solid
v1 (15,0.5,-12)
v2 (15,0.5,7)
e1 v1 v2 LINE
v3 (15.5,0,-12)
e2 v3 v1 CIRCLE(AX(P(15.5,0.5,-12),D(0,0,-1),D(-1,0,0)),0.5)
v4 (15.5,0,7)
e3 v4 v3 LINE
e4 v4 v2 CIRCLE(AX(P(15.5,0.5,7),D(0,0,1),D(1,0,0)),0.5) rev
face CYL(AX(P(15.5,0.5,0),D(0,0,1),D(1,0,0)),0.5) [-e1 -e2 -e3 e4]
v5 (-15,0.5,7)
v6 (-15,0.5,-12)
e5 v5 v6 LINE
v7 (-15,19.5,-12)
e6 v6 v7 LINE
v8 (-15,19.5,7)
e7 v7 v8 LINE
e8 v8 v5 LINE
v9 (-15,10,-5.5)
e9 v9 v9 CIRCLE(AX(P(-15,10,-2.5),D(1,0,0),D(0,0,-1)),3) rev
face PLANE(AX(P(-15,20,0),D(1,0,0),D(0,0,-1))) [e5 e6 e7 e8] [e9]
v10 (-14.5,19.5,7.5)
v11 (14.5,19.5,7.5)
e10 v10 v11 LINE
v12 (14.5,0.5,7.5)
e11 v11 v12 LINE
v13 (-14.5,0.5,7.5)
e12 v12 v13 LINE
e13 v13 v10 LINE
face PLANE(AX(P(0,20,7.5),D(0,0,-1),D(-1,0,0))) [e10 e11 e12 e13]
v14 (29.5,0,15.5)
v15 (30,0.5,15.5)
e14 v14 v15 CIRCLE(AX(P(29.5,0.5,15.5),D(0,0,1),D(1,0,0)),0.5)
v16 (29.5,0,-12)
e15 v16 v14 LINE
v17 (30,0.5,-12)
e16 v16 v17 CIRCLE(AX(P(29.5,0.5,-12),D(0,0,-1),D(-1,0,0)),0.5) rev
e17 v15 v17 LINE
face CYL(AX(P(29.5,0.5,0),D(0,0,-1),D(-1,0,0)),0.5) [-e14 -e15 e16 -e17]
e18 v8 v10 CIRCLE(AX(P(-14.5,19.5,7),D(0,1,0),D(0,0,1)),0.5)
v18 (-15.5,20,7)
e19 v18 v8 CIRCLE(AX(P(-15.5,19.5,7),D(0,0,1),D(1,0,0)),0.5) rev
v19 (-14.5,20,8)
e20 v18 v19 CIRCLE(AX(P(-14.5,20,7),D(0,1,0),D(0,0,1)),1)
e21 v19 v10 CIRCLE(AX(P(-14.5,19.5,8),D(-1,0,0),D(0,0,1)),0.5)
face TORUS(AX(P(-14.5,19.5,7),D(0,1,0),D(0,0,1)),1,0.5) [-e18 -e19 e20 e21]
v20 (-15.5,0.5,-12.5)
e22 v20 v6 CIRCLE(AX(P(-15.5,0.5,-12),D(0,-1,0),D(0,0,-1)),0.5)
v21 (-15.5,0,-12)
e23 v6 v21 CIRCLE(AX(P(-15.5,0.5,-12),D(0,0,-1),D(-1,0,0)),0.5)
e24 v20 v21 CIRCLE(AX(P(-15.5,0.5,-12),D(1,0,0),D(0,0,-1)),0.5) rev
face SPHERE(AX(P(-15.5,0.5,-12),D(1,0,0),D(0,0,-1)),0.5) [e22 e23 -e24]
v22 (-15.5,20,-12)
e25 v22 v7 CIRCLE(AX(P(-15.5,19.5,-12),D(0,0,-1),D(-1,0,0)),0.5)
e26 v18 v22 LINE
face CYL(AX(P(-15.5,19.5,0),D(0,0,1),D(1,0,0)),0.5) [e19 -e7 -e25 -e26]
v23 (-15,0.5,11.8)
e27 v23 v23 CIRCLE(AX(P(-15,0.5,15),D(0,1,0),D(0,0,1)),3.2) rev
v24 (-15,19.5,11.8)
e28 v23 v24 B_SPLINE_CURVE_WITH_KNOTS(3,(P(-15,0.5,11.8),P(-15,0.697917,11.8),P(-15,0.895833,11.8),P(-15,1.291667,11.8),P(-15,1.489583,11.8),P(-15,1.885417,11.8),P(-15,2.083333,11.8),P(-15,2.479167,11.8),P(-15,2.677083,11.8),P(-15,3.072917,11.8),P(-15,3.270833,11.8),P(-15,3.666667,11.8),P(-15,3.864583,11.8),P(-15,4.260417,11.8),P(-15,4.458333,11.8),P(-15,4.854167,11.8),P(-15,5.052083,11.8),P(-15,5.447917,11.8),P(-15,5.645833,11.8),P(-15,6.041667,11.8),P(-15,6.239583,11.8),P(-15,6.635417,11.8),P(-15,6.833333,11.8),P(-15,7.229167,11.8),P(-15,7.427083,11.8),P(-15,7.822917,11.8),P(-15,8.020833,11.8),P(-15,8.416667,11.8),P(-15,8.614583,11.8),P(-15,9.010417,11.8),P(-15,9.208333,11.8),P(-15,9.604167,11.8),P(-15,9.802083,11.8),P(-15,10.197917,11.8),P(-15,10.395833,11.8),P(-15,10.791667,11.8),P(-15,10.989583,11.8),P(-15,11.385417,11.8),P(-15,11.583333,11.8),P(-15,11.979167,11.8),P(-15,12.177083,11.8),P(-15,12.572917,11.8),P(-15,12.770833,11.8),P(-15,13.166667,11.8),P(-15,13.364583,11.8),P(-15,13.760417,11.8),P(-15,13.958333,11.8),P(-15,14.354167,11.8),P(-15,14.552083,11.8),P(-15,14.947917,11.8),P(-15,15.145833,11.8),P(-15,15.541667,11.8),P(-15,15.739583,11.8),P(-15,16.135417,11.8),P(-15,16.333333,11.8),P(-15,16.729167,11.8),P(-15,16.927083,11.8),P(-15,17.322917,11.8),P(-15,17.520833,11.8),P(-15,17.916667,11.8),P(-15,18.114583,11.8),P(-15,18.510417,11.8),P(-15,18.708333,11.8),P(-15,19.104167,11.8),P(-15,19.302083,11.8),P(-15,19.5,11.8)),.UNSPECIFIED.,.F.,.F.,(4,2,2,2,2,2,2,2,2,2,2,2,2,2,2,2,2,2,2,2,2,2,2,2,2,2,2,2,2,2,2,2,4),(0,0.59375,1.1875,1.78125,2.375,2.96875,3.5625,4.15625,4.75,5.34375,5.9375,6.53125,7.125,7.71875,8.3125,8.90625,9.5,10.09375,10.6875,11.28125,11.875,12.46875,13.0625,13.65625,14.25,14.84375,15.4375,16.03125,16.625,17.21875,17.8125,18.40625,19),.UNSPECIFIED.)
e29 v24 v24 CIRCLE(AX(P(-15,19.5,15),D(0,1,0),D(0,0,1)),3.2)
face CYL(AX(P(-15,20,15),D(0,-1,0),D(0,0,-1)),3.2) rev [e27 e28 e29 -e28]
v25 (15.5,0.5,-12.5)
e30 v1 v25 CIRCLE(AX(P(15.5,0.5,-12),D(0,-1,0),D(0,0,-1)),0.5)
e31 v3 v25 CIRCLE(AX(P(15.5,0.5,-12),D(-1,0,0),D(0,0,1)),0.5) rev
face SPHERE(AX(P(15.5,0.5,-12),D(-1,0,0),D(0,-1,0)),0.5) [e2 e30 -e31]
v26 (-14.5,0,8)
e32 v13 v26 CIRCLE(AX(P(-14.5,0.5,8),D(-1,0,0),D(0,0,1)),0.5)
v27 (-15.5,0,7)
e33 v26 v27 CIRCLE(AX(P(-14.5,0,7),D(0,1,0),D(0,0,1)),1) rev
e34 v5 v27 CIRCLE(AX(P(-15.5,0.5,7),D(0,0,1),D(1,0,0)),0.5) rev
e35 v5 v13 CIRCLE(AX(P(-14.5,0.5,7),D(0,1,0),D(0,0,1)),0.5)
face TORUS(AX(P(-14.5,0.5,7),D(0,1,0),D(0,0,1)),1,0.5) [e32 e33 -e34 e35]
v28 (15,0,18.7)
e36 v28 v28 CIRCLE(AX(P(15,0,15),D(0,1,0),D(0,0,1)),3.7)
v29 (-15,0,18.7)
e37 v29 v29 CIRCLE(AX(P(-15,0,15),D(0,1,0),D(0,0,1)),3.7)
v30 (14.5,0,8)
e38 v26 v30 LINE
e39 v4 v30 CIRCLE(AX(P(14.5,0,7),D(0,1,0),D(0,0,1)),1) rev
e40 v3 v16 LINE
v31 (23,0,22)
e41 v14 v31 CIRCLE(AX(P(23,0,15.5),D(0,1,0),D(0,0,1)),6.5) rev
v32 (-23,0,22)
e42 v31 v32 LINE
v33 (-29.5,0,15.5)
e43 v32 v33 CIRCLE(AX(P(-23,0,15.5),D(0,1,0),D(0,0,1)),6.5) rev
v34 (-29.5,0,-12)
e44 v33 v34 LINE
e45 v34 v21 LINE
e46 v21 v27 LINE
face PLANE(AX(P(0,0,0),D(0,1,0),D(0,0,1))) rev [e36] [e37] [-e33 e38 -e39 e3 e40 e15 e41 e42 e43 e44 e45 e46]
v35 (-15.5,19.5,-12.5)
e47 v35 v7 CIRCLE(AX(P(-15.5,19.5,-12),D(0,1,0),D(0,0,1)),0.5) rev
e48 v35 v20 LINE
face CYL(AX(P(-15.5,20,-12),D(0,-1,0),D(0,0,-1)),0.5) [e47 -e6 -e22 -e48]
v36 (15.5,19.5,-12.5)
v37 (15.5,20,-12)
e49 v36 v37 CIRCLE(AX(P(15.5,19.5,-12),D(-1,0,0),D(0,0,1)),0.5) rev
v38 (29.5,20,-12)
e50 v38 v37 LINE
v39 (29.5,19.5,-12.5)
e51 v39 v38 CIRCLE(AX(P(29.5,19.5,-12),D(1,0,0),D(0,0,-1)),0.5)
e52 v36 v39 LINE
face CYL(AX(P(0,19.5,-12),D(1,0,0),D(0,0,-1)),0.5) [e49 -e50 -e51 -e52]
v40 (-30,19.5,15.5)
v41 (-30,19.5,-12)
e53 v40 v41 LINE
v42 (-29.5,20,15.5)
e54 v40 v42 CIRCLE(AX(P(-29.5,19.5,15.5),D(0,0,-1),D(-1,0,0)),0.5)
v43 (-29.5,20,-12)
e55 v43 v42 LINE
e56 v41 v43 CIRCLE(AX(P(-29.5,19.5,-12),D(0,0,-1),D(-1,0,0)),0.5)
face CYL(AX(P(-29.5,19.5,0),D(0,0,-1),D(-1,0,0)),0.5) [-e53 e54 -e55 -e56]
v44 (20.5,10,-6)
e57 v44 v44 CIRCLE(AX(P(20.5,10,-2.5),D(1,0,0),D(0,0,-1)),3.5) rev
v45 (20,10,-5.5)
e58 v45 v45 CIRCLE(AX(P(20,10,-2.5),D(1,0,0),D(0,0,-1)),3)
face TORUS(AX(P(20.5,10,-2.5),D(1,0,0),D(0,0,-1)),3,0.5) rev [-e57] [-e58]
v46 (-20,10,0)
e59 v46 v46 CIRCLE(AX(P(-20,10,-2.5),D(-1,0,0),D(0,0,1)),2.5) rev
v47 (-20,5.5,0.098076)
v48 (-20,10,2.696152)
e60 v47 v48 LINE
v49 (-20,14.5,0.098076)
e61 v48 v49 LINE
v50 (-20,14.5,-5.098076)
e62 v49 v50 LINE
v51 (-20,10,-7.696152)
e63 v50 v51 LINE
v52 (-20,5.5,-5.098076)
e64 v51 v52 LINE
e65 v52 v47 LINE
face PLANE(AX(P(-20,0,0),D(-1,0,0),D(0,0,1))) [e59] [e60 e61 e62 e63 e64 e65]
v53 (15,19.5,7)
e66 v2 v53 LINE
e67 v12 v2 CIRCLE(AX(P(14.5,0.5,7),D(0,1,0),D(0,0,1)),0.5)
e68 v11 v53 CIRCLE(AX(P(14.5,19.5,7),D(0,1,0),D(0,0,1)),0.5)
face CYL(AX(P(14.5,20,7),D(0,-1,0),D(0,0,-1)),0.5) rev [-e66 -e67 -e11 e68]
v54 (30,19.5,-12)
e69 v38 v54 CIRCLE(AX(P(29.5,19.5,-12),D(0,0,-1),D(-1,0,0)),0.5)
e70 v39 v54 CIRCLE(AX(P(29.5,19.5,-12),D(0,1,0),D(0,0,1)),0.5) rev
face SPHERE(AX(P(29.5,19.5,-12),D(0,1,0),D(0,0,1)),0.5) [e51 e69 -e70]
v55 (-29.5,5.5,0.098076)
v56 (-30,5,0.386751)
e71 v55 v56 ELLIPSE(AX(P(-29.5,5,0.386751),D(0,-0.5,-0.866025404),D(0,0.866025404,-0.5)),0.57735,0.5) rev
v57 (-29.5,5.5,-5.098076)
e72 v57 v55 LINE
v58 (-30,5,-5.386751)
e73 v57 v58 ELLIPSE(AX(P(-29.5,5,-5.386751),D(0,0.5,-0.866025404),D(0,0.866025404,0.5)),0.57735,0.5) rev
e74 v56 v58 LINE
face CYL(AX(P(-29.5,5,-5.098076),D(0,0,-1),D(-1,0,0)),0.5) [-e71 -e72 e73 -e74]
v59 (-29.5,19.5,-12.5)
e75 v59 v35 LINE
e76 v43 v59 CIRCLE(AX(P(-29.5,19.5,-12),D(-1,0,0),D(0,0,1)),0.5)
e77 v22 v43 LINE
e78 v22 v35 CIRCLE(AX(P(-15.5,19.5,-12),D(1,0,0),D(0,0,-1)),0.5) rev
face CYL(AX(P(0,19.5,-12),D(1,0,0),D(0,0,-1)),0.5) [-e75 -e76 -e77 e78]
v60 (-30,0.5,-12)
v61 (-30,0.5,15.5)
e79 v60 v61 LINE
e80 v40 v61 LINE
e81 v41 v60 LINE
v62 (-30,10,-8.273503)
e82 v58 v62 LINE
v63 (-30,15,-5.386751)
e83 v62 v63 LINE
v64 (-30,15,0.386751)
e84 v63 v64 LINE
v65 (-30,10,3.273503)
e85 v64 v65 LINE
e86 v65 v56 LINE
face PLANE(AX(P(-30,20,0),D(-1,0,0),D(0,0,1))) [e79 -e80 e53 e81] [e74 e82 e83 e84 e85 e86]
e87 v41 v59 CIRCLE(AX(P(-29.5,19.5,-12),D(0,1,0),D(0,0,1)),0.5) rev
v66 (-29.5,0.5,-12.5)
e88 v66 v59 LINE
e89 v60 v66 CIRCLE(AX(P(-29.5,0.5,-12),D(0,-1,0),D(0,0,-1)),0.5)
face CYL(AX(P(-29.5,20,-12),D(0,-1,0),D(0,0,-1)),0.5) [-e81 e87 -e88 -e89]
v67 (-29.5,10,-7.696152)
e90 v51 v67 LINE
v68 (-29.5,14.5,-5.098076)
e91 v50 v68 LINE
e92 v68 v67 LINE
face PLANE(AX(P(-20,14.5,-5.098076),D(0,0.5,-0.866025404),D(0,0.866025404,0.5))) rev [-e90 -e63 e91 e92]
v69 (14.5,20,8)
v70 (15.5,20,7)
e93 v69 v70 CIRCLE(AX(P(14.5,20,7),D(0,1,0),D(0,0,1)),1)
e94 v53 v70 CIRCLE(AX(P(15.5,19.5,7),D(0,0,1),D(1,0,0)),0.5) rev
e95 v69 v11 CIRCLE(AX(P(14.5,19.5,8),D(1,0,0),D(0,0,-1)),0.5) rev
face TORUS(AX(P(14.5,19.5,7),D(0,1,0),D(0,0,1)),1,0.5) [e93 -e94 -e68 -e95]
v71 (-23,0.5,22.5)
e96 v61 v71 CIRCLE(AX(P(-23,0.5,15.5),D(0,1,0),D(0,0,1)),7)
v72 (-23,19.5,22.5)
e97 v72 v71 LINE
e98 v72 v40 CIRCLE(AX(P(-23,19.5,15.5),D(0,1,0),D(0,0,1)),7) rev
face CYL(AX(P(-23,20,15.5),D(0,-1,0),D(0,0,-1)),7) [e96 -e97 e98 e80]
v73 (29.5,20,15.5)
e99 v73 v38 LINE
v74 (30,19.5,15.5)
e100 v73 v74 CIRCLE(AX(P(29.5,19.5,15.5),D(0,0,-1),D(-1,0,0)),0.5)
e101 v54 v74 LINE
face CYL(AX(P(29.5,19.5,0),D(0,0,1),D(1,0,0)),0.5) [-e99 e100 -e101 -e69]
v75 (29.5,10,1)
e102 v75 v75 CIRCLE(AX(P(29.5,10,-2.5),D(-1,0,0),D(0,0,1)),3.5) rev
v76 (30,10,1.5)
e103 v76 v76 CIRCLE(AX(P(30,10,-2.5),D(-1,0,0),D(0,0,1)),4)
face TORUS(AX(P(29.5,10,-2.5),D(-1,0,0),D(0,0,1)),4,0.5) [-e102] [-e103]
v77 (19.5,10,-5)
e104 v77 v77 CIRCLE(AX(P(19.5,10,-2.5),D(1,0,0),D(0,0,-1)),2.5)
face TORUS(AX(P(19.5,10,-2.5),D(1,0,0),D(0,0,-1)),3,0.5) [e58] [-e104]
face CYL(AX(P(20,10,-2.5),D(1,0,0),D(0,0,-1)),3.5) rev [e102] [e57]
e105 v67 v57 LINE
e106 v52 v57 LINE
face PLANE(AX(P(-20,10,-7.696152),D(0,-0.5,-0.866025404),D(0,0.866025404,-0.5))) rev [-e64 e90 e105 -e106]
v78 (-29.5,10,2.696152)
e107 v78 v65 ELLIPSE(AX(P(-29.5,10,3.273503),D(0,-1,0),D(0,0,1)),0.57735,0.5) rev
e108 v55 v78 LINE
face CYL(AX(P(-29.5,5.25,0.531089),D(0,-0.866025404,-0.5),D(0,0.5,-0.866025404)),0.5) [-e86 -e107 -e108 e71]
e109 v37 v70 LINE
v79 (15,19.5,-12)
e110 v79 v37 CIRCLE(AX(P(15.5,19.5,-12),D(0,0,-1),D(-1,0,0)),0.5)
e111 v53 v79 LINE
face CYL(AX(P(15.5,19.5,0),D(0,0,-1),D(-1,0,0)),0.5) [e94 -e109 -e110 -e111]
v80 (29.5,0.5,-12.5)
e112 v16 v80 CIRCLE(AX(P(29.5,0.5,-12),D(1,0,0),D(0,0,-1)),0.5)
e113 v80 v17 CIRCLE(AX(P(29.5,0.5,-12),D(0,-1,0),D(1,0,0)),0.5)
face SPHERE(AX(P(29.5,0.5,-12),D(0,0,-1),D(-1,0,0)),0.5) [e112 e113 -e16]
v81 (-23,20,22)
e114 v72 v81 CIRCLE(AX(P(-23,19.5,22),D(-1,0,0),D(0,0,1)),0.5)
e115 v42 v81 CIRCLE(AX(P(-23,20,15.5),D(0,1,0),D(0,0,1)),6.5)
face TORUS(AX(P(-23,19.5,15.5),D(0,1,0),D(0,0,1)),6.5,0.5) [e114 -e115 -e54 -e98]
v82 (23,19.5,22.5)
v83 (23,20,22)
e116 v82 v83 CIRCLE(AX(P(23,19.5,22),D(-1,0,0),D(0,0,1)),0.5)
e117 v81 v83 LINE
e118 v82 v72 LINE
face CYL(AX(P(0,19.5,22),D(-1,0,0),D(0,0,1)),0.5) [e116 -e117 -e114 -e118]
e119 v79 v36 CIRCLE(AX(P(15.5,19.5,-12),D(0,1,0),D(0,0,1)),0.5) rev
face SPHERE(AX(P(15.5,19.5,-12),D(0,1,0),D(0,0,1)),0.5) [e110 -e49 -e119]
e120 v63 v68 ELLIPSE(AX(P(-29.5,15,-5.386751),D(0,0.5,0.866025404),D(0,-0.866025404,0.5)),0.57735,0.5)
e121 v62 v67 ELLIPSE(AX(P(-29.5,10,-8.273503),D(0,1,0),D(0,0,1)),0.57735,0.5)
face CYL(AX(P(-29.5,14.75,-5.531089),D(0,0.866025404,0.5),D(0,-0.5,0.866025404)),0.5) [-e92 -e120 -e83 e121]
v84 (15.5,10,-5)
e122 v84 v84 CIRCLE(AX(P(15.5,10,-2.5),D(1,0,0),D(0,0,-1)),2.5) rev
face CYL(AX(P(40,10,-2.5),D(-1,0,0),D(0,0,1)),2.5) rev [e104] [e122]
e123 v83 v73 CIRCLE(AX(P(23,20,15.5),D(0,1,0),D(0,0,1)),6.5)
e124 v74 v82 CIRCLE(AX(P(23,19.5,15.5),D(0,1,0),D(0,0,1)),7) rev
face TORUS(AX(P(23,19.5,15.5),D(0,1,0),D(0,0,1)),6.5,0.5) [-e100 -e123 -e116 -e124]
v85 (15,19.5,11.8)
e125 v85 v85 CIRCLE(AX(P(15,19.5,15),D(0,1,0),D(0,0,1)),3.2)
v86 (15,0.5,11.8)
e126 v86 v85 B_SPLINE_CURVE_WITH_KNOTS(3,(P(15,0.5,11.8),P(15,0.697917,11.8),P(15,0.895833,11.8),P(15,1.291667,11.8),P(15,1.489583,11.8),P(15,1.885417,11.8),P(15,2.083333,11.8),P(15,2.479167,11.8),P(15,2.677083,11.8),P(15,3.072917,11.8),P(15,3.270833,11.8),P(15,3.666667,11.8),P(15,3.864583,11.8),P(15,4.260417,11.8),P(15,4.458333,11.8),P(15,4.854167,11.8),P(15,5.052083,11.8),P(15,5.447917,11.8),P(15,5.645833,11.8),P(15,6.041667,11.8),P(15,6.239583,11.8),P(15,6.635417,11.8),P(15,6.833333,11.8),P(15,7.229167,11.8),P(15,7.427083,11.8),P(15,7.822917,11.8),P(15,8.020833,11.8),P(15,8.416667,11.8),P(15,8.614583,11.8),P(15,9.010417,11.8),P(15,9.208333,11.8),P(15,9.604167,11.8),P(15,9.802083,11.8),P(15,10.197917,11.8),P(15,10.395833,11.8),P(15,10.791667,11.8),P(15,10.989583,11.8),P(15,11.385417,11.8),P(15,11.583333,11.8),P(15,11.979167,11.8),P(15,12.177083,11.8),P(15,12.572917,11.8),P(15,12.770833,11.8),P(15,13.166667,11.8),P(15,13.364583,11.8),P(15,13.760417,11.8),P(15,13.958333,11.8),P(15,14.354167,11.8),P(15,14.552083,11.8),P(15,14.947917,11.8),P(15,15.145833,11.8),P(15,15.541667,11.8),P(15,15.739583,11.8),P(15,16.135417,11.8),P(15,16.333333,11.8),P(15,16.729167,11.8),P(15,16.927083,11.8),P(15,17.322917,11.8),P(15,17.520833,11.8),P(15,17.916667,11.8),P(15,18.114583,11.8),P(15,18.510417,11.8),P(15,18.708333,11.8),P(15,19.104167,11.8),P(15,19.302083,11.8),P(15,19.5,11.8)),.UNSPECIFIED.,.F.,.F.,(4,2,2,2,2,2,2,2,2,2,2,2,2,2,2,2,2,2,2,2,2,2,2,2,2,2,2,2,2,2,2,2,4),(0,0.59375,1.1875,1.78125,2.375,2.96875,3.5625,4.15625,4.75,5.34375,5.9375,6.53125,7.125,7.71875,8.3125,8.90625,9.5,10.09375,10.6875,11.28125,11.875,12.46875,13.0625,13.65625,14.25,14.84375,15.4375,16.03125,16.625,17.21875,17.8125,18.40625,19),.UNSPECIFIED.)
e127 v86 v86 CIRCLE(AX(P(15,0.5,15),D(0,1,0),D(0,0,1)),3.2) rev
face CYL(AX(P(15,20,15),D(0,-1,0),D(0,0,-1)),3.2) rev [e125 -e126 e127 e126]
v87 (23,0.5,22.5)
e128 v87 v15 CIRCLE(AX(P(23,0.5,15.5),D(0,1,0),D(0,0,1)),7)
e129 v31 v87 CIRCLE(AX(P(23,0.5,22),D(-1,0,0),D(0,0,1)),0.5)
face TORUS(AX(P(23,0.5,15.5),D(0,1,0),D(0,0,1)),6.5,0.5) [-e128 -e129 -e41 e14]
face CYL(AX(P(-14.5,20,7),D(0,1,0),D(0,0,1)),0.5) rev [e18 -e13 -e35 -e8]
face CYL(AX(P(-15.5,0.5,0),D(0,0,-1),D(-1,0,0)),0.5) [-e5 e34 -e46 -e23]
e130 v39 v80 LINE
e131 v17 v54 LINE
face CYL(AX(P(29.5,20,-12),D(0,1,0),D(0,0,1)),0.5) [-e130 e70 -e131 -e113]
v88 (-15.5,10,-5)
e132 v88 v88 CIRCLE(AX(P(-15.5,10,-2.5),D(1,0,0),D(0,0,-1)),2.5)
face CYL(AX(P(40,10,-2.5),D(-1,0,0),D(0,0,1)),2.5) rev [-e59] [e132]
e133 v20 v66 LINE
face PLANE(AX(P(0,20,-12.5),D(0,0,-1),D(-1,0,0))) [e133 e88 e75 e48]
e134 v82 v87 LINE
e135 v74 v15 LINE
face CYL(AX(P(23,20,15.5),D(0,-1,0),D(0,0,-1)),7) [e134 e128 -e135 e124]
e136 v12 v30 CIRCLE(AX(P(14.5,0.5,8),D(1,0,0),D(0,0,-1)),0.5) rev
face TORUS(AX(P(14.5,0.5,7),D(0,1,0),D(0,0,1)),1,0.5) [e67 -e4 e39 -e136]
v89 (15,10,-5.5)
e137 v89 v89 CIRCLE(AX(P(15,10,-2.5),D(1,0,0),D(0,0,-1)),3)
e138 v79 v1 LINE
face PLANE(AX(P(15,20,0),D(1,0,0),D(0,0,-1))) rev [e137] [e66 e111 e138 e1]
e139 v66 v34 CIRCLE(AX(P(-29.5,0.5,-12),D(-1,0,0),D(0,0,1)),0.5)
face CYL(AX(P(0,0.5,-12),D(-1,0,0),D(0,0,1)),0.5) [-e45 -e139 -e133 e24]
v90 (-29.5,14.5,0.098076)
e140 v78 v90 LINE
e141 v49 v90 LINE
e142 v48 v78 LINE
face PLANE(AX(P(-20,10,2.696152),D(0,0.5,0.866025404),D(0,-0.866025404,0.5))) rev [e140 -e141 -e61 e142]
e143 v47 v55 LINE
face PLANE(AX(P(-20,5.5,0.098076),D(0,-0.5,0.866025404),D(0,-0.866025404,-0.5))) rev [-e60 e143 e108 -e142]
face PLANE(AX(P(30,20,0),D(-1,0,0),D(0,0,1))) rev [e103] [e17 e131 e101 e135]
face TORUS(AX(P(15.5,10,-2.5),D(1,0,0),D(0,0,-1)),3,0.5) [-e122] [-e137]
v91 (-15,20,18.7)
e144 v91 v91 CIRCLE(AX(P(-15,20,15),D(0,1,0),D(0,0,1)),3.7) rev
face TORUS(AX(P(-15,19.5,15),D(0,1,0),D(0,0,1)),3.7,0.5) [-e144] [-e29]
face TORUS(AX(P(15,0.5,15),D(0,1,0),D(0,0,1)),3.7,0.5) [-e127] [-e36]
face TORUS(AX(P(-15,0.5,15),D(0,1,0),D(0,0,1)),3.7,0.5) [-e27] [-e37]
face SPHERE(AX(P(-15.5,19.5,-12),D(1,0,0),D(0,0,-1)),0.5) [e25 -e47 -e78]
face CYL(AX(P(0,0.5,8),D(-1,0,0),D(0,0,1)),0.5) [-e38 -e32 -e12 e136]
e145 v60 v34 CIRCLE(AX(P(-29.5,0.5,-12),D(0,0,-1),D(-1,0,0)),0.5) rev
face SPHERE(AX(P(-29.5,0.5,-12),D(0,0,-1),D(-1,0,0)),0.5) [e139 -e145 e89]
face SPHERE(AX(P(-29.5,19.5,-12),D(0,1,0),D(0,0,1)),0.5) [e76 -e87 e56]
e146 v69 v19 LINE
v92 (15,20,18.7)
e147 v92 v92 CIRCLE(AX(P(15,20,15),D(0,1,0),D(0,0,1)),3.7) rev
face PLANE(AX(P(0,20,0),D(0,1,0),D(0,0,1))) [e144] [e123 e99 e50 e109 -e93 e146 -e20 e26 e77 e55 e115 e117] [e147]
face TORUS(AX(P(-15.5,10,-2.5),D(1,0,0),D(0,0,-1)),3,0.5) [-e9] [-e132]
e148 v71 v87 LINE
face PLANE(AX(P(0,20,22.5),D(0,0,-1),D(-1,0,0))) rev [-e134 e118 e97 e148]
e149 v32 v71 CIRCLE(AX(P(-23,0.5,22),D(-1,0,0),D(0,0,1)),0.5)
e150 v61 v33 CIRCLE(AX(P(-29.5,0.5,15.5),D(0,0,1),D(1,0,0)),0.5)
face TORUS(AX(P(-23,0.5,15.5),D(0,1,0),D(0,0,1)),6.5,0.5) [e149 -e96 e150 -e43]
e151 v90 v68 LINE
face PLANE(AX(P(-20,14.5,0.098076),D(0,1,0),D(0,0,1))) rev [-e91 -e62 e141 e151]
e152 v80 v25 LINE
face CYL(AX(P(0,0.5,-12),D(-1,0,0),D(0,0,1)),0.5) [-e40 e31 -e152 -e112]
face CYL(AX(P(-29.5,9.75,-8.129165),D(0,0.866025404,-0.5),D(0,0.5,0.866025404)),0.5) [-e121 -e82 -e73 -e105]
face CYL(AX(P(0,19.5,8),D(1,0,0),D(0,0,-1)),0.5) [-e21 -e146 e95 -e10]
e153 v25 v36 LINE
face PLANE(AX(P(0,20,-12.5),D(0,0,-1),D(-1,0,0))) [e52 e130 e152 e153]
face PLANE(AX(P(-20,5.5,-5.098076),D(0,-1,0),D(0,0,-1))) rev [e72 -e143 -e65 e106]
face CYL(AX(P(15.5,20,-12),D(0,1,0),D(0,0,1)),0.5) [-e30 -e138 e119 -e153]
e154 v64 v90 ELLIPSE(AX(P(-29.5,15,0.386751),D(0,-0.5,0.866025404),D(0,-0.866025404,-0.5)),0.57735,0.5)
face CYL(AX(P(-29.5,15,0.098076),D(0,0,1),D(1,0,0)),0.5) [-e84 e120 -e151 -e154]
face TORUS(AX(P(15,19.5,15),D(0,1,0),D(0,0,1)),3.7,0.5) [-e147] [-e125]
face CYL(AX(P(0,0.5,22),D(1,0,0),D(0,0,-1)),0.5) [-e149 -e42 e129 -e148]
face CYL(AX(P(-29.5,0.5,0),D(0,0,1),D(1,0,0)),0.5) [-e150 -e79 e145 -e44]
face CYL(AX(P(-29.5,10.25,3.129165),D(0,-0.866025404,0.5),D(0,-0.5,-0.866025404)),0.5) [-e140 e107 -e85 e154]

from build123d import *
from build123d.topology import SkipClean

# Parameters (mm, degrees)
SKETCH1_R           = 3.2
BOSS_EXTRUDE1_DEPTH = 20
SKETCH2_R           = 2.5
CUT_EXTRUDE1_DEPTH  = 70
FILLET1_R           = 0.5
SKETCH4_R           = 3.5
CUT_EXTRUDE2_DEPTH  = 10
CUT_EXTRUDE3_DEPTH  = 10
FILLET2_R           = 0.5


with BuildPart() as part:
    # Sketch1 → Boss-Extrude1 (new body)
    # profile 1 of 2: a face of its own
    with SkipClean():  # the faces are left unmerged after this step: merging them gives an invalid solid
        with BuildSketch(Plane(origin=(0, 0, 0), x_dir=(1, 0, 0), z_dir=(0, 1, 0))):
            with BuildLine():
                Line((-30, 12.5), (-30, -12.5))
                Line((-30, -12.5), (-16.997498436, -12.5))
                ThreePointArc((-16.997498436, -12.5), (-15, -11.8), (-13.002501564, -12.5))
                Line((-13.002501564, -12.5), (13.002501564, -12.5))
                ThreePointArc((13.002501564, -12.5), (15, -11.8), (16.997498436, -12.5))
                Line((16.997498436, -12.5), (30, -12.5))
                Line((30, -12.5), (30, 12.5))
                Line((30, 12.5), (15, 12.5))
                Line((15, 12.5), (15, -7.5))
                Line((15, -7.5), (-15, -7.5))
                Line((-15, -7.5), (-15, 12.5))
                Line((-15, 12.5), (-30, 12.5))
            make_face()
        # profile 2 of 2: a face of its own
        with BuildSketch(Plane(origin=(0, 0, 0), x_dir=(1, 0, 0), z_dir=(0, 1, 0))):
            with BuildLine():
                Line((-30, -12.5), (-30, -15.5))
                ThreePointArc((-30, -15.5), (-27.949747468, -20.449747468), (-23, -22.5))
                Line((-23, -22.5), (23, -22.5))
                ThreePointArc((23, -22.5), (27.949747468, -20.449747468), (30, -15.5))
                Line((30, -15.5), (30, -12.5))
                Line((30, -12.5), (-30, -12.5))
            make_face()
            with Locations(Location((15, -15, 0), (0, 0, 90))):
                Circle(SKETCH1_R, mode=Mode.SUBTRACT)
            with Locations(Location((-15, -15, 0), (0, 0, 90))):
                Circle(SKETCH1_R, mode=Mode.SUBTRACT)
        extrude(amount=BOSS_EXTRUDE1_DEPTH)

    # Sketch2 → Cut-Extrude1 (cut)
    with SkipClean():  # the faces are left unmerged after this step: merging them gives an invalid solid
        with BuildSketch(Plane.ZY.offset(30)):
            with Locations((-2.5, 10)):
                Circle(SKETCH2_R)
        extrude(amount=-CUT_EXTRUDE1_DEPTH, mode=Mode.SUBTRACT)

    # Fillet1
    fillet1_edges = [part.edges().sort_by_distance(p)[0] for p in [
        (27.949747468, 20, 20.449747468),
        (-15, 0, 18.2),
        (0, 0, 22.5),
        (-27.949747468, 0, 20.449747468),
        (-30, 0, 0),
        (-22.5, 0, -12.5),
        (-15, 0, -2.5),
        (0, 0, 7.5),
        (30, 20, 0),
        (15, 0, -2.5),
        (22.5, 0, -12.5),
        (30, 0, 0),
        (27.949747468, 0, 20.449747468),
        (15, 0, 18.2),
        (-30, 10, -12.5),
        (-15, 10, -12.5),
        (-15, 10, 7.5),
        (15, 10, 7.5),
        (15, 10, -12.5),
        (22.5, 20, -12.5),
        (30, 10, -12.5),
        (15, 20, -2.5),
        (0, 20, 7.5),
        (-15, 20, -2.5),
        (15, 10, -5),
        (30, 10, -5),
        (-15, 10, -5),
        (-30, 10, -5),
        (-22.5, 20, -12.5),
        (-30, 20, 0),
        (-27.949747468, 20, 20.449747468),
        (0, 20, 22.5),
        (-15, 20, 18.2),
        (15, 20, 18.2),
    ]]
    fillet(fillet1_edges, radius=FILLET1_R)

    # Sketch4 → Cut-Extrude2 (cut)
    with BuildSketch(Plane(origin=(30, 0, 0), x_dir=(0, 0, -1), z_dir=(1, 0, 0))):
        with Locations((2.5, 10)):
            Circle(SKETCH4_R)
    extrude(amount=-CUT_EXTRUDE2_DEPTH, mode=Mode.SUBTRACT)

    # Sketch3 → Cut-Extrude3 (cut)
    with BuildSketch(Plane.ZY.offset(30)):
        Polygon((2.696152423, 10), (0.098076211, 14.5), (-5.098076211, 14.5), (-7.696152423, 10), (-5.098076211, 5.5), (0.098076211, 5.5), align=None)
    extrude(amount=-CUT_EXTRUDE3_DEPTH, mode=Mode.SUBTRACT)

    # Fillet2
    fillet2_edges = [part.edges().sort_by_distance(p)[0] for p in [
        (20, 10, 1),
        (20, 10, -5),
        (30, 10, 1),
        (-30, 7.75, 1.397114317),
        (-30, 12.25, 1.397114317),
        (-30, 14.5, -2.5),
        (-30, 12.25, -6.397114317),
        (-30, 7.75, -6.397114317),
        (-30, 5.5, -2.5),
    ]]
    fillet(fillet2_edges, radius=FILLET2_R - 0.0001)  # a hair under: the kernel refuses the full size


solid = part.part
